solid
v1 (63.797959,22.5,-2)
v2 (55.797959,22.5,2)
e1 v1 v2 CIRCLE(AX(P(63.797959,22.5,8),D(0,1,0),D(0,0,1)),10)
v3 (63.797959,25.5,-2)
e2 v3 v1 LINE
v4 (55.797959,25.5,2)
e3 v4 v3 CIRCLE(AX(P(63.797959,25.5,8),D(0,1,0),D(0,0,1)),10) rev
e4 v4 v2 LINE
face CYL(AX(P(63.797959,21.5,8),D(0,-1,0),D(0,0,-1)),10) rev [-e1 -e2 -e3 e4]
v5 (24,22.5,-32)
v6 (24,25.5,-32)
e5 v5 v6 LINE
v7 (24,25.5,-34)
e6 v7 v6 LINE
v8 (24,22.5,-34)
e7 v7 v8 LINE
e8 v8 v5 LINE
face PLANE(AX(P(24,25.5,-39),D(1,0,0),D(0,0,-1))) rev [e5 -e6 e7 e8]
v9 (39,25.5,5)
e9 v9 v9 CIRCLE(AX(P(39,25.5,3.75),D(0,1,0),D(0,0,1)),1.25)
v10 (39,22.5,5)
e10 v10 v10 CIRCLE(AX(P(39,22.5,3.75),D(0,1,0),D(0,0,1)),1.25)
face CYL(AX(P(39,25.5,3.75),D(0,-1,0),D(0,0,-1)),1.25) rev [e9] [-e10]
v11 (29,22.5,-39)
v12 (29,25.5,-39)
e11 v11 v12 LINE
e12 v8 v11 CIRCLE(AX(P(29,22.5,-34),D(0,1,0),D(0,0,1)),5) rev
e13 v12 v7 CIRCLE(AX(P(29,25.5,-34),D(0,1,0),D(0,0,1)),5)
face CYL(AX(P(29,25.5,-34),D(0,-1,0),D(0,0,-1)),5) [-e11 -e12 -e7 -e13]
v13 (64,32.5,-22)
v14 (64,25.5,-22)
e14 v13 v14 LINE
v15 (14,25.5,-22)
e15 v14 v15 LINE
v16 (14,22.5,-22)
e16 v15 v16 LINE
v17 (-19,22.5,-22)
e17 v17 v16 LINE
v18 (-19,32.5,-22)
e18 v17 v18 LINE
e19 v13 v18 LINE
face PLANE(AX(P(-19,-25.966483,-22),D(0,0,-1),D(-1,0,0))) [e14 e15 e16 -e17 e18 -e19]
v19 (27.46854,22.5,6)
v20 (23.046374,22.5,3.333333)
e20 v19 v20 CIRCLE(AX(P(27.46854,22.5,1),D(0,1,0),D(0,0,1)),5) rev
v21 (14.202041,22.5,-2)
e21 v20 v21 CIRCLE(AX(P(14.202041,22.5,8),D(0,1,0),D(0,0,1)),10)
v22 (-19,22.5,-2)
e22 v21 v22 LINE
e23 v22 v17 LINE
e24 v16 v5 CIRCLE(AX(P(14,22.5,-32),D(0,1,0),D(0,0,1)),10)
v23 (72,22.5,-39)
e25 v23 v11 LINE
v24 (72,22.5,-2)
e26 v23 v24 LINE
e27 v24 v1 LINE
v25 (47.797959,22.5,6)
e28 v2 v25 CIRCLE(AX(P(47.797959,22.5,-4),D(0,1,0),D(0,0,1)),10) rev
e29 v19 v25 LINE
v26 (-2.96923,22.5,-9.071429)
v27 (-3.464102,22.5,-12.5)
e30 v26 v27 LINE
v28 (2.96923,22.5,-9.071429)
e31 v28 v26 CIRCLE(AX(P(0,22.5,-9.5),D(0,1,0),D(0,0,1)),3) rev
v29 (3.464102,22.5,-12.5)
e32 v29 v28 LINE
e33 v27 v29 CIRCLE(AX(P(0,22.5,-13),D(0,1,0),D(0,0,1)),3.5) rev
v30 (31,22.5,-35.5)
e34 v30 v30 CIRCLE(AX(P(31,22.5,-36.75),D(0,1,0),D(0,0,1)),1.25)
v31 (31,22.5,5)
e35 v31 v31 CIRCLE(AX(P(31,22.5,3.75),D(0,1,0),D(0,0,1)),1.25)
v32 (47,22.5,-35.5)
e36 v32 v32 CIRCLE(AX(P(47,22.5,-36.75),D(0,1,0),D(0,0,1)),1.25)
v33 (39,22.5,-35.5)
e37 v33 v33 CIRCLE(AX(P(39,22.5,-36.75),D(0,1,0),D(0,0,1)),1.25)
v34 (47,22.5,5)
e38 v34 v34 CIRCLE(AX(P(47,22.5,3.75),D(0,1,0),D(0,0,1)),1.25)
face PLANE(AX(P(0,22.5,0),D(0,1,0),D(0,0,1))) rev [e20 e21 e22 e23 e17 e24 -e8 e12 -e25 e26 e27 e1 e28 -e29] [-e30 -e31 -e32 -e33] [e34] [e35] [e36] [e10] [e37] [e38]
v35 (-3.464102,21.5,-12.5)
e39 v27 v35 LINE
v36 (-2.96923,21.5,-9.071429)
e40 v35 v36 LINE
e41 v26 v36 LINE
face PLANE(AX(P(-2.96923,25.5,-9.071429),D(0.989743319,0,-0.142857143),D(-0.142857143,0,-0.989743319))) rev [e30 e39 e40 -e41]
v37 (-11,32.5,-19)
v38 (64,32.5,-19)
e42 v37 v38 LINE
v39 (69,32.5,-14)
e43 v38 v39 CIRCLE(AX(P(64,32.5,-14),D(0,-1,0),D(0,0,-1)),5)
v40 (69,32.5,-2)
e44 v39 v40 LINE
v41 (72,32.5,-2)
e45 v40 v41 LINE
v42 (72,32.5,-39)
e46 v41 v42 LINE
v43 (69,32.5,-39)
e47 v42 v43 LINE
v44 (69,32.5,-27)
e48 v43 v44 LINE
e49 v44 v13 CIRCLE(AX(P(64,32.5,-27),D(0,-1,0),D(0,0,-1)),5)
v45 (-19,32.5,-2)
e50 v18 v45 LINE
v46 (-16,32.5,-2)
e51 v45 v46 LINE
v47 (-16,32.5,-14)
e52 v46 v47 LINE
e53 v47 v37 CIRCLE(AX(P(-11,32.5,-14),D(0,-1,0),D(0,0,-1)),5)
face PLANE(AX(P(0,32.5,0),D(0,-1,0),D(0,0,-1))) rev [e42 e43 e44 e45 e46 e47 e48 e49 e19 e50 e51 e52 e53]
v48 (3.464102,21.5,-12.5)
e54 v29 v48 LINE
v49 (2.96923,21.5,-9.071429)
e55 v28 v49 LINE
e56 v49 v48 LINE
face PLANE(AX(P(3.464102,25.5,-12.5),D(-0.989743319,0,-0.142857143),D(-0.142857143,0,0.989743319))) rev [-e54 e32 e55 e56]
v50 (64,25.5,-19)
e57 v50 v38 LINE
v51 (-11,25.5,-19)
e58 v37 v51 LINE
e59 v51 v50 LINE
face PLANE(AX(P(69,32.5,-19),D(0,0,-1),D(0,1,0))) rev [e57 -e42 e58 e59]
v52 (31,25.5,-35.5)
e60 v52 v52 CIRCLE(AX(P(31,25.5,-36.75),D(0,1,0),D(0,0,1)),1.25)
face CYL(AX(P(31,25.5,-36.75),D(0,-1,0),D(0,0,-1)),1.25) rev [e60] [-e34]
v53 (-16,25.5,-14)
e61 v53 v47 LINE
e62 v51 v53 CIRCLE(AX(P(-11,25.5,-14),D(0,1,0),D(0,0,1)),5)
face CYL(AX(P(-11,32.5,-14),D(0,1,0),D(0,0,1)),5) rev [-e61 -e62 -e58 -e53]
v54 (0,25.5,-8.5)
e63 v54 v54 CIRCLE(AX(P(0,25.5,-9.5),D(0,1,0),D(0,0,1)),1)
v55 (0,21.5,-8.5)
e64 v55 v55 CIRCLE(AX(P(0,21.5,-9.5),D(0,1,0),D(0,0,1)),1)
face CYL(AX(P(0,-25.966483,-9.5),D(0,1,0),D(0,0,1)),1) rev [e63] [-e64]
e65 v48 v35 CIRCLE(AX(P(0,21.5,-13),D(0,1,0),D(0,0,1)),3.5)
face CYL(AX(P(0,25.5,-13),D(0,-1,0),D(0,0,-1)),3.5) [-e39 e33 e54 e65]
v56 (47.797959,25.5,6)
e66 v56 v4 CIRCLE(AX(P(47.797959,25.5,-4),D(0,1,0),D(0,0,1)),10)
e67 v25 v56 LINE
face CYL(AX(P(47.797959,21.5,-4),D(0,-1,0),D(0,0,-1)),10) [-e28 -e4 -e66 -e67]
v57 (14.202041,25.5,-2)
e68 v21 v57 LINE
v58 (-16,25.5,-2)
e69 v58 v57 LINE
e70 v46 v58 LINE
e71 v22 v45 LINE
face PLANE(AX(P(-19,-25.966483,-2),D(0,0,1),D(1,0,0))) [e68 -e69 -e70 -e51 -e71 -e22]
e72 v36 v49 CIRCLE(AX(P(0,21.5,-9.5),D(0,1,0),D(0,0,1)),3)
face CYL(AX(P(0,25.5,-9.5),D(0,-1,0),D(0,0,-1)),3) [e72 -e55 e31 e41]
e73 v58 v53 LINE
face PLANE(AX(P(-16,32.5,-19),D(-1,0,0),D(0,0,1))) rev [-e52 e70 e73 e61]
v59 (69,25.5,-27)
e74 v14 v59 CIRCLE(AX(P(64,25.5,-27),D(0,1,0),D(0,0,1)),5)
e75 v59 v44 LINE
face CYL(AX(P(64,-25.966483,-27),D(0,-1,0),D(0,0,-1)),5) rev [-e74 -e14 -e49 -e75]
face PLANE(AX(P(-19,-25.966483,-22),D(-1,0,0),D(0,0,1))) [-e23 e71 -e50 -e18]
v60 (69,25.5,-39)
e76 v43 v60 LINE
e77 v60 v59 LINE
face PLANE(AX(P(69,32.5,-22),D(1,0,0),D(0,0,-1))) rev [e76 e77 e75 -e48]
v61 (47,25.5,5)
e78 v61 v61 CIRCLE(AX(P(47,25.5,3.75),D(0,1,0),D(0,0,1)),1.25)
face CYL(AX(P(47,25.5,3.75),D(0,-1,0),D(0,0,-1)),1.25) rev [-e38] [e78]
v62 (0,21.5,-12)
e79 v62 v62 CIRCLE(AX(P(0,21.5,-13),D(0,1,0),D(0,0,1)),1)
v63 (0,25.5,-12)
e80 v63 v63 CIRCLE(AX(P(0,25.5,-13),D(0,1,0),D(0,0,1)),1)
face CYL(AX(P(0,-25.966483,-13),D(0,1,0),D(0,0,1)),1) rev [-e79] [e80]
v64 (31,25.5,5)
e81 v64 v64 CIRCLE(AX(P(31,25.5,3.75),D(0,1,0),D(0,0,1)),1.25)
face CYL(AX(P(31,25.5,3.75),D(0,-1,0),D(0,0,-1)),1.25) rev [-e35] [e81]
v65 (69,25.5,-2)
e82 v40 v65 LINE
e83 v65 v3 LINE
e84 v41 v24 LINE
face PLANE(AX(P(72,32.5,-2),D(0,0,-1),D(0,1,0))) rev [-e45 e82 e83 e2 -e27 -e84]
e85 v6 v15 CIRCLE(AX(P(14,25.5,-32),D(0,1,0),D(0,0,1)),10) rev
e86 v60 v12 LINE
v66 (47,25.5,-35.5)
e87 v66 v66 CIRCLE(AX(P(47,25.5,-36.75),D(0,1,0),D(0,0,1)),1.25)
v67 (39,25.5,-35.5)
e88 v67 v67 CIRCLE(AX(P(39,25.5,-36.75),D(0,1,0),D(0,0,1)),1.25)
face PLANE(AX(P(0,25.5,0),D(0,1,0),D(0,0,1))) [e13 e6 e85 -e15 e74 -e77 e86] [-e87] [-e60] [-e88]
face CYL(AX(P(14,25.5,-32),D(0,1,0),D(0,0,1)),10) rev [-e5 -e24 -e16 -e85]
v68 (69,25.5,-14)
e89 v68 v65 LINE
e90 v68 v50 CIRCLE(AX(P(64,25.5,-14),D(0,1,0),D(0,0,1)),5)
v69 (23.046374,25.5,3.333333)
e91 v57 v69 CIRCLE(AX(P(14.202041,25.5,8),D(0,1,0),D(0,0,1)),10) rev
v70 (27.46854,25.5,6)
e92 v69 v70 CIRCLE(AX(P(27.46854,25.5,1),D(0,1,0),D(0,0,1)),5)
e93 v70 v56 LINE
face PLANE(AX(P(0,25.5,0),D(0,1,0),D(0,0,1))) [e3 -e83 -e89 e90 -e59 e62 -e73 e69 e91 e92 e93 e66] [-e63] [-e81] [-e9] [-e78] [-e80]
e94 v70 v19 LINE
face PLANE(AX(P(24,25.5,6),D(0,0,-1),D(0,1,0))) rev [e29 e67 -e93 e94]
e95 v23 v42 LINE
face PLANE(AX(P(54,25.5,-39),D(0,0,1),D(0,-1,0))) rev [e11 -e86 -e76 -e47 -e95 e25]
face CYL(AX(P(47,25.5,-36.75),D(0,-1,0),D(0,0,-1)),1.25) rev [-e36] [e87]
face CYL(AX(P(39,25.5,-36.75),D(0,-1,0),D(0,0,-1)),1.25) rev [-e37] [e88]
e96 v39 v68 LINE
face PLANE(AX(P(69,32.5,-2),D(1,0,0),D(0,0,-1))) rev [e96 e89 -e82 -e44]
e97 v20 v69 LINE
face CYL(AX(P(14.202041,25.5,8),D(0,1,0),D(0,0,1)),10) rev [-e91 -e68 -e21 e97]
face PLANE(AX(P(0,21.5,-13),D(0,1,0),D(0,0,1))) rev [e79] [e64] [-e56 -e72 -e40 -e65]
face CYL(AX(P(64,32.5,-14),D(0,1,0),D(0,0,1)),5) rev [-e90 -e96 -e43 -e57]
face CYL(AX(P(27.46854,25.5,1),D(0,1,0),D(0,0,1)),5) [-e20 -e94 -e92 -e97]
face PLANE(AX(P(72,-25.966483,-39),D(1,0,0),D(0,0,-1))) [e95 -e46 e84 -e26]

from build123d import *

# Parameters (mm, degrees)
SKETCH1_W           = 30
SKETCH1_H           = 45
SKETCH1_R           = 1.25
LASER_IF_DEPTH      = 3
SKETCH4_R           = 1
VLS_IF_TOP_DEPTH    = 4
SKETCH5_W           = 43
SKETCH5_H           = 20
SKETCH5_R           = 1
SKETCH5_W_2         = 18
SKETCH5_H_2         = 45
BOSS_EXTRUDE1_DEPTH = 3
FILLET1_R           = 10
FILLET2_R           = 5
BOSS_EXTRUDE2_DEPTH = 7
FILLET3_R           = 5
SKETCH7_W           = 18
SKETCH7_H           = 8
CUT_EXTRUDE1_DEPTH  = 83.182723245
FILLET4_R           = 10
FILLET5_R           = 10


with BuildPart() as part:
    # Sketch1 → LASER IF (new body)
    with BuildSketch(Plane(origin=(0, 22.5, 0), x_dir=(1, 0, 0), z_dir=(0, 1, 0))):
        with Locations((39, 16.5)):
            Rectangle(SKETCH1_W, SKETCH1_H)
        with Locations(Location((47, -3.75, 0), (0, 0, 270))):
            Circle(SKETCH1_R, mode=Mode.SUBTRACT)
        with Locations(Location((39, -3.75, 0), (0, 0, 270))):
            Circle(SKETCH1_R, mode=Mode.SUBTRACT)
        with Locations(Location((31, -3.75, 0), (0, 0, 270))):
            Circle(SKETCH1_R, mode=Mode.SUBTRACT)
        with Locations(Location((47, 36.75, 0), (0, 0, 270))):
            Circle(SKETCH1_R, mode=Mode.SUBTRACT)
        with Locations(Location((39, 36.75, 0), (0, 0, 270))):
            Circle(SKETCH1_R, mode=Mode.SUBTRACT)
        with Locations(Location((31, 36.75, 0), (0, 0, 270))):
            Circle(SKETCH1_R, mode=Mode.SUBTRACT)
    extrude(amount=LASER_IF_DEPTH)



with BuildPart() as body_2:
    # Sketch4 → VLS IF TOP (new body)
    with BuildSketch(Plane(origin=(0, 21.5, 0), x_dir=(1, 0, 0), z_dir=(0, 1, 0))):
        with BuildLine():
            Line((3.464101615, 12.5), (2.969229956, 9.071428571))
            ThreePointArc((2.969229956, 9.071428571), (0, 6.5), (-2.969229956, 9.071428571))
            Line((-2.969229956, 9.071428571), (-3.464101615, 12.5))
            ThreePointArc((-3.464101615, 12.5), (0, 16.5), (3.464101615, 12.5))
        make_face()
        with Locations(Location((0, 13, 0), (0, 0, 270))):
            Circle(SKETCH4_R, mode=Mode.SUBTRACT)
        with Locations(Location((0, 9.5, 0), (0, 0, 270))):
            Circle(SKETCH4_R, mode=Mode.SUBTRACT)
    extrude(amount=VLS_IF_TOP_DEPTH)


with BuildPart() as part_1:
    add(part.part)

    add(body_2.part)  # Boss-Extrude1 merges body 2
    # Sketch5 → Boss-Extrude1 (add)
    # profile 1 of 2: a face of its own
    with BuildSketch(Plane(origin=(0, 25.5, 0), x_dir=(1, 0, 0), z_dir=(0, 1, 0))):
        with Locations((2.5, 12)):
            Rectangle(SKETCH5_W, SKETCH5_H)
        with Locations(Location((0, 9.5, 0), (0, 0, 270))):
            Circle(SKETCH5_R, mode=Mode.SUBTRACT)
        with Locations(Location((0, 13, 0), (0, 0, 270))):
            Circle(SKETCH5_R, mode=Mode.SUBTRACT)
    # profile 2 of 2: a face of its own
    with BuildSketch(Plane(origin=(0, 25.5, 0), x_dir=(1, 0, 0), z_dir=(0, 1, 0))):
        with Locations((63, 16.5)):
            Rectangle(SKETCH5_W_2, SKETCH5_H_2)
    extrude(amount=-BOSS_EXTRUDE1_DEPTH)

    # Fillet1
    # the kernel refuses this fillet: 10 mm, written as the material it adds along each edge
    with BuildSketch(Plane(origin=(24, 25.5, -2), x_dir=(-1, 0, 0), z_dir=(0, -1, 0))) as fillet1_piece_1:
        with BuildLine():
            CenterArc((9.797958971, -10), FILLET1_R, 90, 78.463040967)
            Line((0, -8), (-0.195959179, -7.96))
            ThreePointArc((-0.195959179, -7.96), (-0.2, -4), (-0.2, 0))
            Line((-0.2, 0), (0, 0.2))
            Line((0, 0.2), (9.797958971, 0.2))
            Line((9.797958971, 0.2), (9.797958971, 0))
        make_face()
    extrude(amount=3)
    with BuildSketch(Plane(origin=(24, 25.5, -22), x_dir=(-1, 0, 0), z_dir=(0, -1, 0))) as fillet1_piece_2:
        with BuildLine():
            CenterArc((FILLET1_R, FILLET1_R), FILLET1_R, 180, 90)
            Line((0, FILLET1_R), (-FILLET1_R * 0.02, FILLET1_R))
            Line((-FILLET1_R * 0.02, FILLET1_R), (-FILLET1_R * 0.02, -FILLET1_R * 0.02))
            Line((-FILLET1_R * 0.02, -FILLET1_R * 0.02), (FILLET1_R, -FILLET1_R * 0.02))
            Line((FILLET1_R, -FILLET1_R * 0.02), (FILLET1_R, 0))
        make_face()
    extrude(amount=3)

    # Fillet2
    fillet2_edges = [part_1.edges().sort_by_distance(p)[0] for p in [
        (24, 24, -39),
        (24, 24, 6),
    ]]
    fillet(fillet2_edges, radius=FILLET2_R)

    # Sketch6 → Boss-Extrude2 (add)
    with BuildSketch(Plane(origin=(0, 25.5, 0), x_dir=(1, 0, 0), z_dir=(0, 1, 0))):
        Polygon((-16, 2), (-19, 2), (-19, 22), (69, 22), (69, 39), (72, 39), (72, 2), (69, 2), (69, 19), (-16, 19), align=None)
    extrude(amount=BOSS_EXTRUDE2_DEPTH)

    # Fillet3
    fillet3_edges = [part_1.edges().sort_by_distance(p)[0] for p in [
        (-16, 29, -19),
        (69, 29, -19),
        (69, 29, -22),
    ]]
    fillet(fillet3_edges, radius=FILLET3_R)

    # Sketch7 → Cut-Extrude1 (cut, through all)
    with BuildSketch(Plane(origin=(0, 25.5, 0), x_dir=(1, 0, 0), z_dir=(0, 1, 0))):
        with Locations((63, -2)):
            Rectangle(SKETCH7_W, SKETCH7_H)
    extrude(amount=-CUT_EXTRUDE1_DEPTH, mode=Mode.SUBTRACT)

    # Fillet4
    # the kernel refuses this fillet: 10 mm, written as the material it adds along each edge
    with BuildSketch(Plane(origin=(54, 25.5, -2), x_dir=(0, 0, 1), z_dir=(0, -1, 0))) as fillet4_piece_1:
        with BuildLine():
            CenterArc((10, -9.797958971), FILLET4_R, 101.536959033, 78.463040967)
            Line((0, -9.797958971), (-0.2, -9.797958971))
            Line((-0.2, -9.797958971), (-0.2, 0))
            Line((-0.2, 0), (0, 0.2))
            ThreePointArc((0, 0.2), (4, 0.2), (7.96, 0.195959179))
            Line((7.96, 0.195959179), (8, 0))
        make_face()
    extrude(amount=3)

    # Fillet5
    fillet5_edges = [part_1.edges().sort_by_distance(p)[0] for p in [
        (54, 24, 6),
    ]]
    fillet(fillet5_edges, radius=FILLET5_R)


solid = part_1.part
